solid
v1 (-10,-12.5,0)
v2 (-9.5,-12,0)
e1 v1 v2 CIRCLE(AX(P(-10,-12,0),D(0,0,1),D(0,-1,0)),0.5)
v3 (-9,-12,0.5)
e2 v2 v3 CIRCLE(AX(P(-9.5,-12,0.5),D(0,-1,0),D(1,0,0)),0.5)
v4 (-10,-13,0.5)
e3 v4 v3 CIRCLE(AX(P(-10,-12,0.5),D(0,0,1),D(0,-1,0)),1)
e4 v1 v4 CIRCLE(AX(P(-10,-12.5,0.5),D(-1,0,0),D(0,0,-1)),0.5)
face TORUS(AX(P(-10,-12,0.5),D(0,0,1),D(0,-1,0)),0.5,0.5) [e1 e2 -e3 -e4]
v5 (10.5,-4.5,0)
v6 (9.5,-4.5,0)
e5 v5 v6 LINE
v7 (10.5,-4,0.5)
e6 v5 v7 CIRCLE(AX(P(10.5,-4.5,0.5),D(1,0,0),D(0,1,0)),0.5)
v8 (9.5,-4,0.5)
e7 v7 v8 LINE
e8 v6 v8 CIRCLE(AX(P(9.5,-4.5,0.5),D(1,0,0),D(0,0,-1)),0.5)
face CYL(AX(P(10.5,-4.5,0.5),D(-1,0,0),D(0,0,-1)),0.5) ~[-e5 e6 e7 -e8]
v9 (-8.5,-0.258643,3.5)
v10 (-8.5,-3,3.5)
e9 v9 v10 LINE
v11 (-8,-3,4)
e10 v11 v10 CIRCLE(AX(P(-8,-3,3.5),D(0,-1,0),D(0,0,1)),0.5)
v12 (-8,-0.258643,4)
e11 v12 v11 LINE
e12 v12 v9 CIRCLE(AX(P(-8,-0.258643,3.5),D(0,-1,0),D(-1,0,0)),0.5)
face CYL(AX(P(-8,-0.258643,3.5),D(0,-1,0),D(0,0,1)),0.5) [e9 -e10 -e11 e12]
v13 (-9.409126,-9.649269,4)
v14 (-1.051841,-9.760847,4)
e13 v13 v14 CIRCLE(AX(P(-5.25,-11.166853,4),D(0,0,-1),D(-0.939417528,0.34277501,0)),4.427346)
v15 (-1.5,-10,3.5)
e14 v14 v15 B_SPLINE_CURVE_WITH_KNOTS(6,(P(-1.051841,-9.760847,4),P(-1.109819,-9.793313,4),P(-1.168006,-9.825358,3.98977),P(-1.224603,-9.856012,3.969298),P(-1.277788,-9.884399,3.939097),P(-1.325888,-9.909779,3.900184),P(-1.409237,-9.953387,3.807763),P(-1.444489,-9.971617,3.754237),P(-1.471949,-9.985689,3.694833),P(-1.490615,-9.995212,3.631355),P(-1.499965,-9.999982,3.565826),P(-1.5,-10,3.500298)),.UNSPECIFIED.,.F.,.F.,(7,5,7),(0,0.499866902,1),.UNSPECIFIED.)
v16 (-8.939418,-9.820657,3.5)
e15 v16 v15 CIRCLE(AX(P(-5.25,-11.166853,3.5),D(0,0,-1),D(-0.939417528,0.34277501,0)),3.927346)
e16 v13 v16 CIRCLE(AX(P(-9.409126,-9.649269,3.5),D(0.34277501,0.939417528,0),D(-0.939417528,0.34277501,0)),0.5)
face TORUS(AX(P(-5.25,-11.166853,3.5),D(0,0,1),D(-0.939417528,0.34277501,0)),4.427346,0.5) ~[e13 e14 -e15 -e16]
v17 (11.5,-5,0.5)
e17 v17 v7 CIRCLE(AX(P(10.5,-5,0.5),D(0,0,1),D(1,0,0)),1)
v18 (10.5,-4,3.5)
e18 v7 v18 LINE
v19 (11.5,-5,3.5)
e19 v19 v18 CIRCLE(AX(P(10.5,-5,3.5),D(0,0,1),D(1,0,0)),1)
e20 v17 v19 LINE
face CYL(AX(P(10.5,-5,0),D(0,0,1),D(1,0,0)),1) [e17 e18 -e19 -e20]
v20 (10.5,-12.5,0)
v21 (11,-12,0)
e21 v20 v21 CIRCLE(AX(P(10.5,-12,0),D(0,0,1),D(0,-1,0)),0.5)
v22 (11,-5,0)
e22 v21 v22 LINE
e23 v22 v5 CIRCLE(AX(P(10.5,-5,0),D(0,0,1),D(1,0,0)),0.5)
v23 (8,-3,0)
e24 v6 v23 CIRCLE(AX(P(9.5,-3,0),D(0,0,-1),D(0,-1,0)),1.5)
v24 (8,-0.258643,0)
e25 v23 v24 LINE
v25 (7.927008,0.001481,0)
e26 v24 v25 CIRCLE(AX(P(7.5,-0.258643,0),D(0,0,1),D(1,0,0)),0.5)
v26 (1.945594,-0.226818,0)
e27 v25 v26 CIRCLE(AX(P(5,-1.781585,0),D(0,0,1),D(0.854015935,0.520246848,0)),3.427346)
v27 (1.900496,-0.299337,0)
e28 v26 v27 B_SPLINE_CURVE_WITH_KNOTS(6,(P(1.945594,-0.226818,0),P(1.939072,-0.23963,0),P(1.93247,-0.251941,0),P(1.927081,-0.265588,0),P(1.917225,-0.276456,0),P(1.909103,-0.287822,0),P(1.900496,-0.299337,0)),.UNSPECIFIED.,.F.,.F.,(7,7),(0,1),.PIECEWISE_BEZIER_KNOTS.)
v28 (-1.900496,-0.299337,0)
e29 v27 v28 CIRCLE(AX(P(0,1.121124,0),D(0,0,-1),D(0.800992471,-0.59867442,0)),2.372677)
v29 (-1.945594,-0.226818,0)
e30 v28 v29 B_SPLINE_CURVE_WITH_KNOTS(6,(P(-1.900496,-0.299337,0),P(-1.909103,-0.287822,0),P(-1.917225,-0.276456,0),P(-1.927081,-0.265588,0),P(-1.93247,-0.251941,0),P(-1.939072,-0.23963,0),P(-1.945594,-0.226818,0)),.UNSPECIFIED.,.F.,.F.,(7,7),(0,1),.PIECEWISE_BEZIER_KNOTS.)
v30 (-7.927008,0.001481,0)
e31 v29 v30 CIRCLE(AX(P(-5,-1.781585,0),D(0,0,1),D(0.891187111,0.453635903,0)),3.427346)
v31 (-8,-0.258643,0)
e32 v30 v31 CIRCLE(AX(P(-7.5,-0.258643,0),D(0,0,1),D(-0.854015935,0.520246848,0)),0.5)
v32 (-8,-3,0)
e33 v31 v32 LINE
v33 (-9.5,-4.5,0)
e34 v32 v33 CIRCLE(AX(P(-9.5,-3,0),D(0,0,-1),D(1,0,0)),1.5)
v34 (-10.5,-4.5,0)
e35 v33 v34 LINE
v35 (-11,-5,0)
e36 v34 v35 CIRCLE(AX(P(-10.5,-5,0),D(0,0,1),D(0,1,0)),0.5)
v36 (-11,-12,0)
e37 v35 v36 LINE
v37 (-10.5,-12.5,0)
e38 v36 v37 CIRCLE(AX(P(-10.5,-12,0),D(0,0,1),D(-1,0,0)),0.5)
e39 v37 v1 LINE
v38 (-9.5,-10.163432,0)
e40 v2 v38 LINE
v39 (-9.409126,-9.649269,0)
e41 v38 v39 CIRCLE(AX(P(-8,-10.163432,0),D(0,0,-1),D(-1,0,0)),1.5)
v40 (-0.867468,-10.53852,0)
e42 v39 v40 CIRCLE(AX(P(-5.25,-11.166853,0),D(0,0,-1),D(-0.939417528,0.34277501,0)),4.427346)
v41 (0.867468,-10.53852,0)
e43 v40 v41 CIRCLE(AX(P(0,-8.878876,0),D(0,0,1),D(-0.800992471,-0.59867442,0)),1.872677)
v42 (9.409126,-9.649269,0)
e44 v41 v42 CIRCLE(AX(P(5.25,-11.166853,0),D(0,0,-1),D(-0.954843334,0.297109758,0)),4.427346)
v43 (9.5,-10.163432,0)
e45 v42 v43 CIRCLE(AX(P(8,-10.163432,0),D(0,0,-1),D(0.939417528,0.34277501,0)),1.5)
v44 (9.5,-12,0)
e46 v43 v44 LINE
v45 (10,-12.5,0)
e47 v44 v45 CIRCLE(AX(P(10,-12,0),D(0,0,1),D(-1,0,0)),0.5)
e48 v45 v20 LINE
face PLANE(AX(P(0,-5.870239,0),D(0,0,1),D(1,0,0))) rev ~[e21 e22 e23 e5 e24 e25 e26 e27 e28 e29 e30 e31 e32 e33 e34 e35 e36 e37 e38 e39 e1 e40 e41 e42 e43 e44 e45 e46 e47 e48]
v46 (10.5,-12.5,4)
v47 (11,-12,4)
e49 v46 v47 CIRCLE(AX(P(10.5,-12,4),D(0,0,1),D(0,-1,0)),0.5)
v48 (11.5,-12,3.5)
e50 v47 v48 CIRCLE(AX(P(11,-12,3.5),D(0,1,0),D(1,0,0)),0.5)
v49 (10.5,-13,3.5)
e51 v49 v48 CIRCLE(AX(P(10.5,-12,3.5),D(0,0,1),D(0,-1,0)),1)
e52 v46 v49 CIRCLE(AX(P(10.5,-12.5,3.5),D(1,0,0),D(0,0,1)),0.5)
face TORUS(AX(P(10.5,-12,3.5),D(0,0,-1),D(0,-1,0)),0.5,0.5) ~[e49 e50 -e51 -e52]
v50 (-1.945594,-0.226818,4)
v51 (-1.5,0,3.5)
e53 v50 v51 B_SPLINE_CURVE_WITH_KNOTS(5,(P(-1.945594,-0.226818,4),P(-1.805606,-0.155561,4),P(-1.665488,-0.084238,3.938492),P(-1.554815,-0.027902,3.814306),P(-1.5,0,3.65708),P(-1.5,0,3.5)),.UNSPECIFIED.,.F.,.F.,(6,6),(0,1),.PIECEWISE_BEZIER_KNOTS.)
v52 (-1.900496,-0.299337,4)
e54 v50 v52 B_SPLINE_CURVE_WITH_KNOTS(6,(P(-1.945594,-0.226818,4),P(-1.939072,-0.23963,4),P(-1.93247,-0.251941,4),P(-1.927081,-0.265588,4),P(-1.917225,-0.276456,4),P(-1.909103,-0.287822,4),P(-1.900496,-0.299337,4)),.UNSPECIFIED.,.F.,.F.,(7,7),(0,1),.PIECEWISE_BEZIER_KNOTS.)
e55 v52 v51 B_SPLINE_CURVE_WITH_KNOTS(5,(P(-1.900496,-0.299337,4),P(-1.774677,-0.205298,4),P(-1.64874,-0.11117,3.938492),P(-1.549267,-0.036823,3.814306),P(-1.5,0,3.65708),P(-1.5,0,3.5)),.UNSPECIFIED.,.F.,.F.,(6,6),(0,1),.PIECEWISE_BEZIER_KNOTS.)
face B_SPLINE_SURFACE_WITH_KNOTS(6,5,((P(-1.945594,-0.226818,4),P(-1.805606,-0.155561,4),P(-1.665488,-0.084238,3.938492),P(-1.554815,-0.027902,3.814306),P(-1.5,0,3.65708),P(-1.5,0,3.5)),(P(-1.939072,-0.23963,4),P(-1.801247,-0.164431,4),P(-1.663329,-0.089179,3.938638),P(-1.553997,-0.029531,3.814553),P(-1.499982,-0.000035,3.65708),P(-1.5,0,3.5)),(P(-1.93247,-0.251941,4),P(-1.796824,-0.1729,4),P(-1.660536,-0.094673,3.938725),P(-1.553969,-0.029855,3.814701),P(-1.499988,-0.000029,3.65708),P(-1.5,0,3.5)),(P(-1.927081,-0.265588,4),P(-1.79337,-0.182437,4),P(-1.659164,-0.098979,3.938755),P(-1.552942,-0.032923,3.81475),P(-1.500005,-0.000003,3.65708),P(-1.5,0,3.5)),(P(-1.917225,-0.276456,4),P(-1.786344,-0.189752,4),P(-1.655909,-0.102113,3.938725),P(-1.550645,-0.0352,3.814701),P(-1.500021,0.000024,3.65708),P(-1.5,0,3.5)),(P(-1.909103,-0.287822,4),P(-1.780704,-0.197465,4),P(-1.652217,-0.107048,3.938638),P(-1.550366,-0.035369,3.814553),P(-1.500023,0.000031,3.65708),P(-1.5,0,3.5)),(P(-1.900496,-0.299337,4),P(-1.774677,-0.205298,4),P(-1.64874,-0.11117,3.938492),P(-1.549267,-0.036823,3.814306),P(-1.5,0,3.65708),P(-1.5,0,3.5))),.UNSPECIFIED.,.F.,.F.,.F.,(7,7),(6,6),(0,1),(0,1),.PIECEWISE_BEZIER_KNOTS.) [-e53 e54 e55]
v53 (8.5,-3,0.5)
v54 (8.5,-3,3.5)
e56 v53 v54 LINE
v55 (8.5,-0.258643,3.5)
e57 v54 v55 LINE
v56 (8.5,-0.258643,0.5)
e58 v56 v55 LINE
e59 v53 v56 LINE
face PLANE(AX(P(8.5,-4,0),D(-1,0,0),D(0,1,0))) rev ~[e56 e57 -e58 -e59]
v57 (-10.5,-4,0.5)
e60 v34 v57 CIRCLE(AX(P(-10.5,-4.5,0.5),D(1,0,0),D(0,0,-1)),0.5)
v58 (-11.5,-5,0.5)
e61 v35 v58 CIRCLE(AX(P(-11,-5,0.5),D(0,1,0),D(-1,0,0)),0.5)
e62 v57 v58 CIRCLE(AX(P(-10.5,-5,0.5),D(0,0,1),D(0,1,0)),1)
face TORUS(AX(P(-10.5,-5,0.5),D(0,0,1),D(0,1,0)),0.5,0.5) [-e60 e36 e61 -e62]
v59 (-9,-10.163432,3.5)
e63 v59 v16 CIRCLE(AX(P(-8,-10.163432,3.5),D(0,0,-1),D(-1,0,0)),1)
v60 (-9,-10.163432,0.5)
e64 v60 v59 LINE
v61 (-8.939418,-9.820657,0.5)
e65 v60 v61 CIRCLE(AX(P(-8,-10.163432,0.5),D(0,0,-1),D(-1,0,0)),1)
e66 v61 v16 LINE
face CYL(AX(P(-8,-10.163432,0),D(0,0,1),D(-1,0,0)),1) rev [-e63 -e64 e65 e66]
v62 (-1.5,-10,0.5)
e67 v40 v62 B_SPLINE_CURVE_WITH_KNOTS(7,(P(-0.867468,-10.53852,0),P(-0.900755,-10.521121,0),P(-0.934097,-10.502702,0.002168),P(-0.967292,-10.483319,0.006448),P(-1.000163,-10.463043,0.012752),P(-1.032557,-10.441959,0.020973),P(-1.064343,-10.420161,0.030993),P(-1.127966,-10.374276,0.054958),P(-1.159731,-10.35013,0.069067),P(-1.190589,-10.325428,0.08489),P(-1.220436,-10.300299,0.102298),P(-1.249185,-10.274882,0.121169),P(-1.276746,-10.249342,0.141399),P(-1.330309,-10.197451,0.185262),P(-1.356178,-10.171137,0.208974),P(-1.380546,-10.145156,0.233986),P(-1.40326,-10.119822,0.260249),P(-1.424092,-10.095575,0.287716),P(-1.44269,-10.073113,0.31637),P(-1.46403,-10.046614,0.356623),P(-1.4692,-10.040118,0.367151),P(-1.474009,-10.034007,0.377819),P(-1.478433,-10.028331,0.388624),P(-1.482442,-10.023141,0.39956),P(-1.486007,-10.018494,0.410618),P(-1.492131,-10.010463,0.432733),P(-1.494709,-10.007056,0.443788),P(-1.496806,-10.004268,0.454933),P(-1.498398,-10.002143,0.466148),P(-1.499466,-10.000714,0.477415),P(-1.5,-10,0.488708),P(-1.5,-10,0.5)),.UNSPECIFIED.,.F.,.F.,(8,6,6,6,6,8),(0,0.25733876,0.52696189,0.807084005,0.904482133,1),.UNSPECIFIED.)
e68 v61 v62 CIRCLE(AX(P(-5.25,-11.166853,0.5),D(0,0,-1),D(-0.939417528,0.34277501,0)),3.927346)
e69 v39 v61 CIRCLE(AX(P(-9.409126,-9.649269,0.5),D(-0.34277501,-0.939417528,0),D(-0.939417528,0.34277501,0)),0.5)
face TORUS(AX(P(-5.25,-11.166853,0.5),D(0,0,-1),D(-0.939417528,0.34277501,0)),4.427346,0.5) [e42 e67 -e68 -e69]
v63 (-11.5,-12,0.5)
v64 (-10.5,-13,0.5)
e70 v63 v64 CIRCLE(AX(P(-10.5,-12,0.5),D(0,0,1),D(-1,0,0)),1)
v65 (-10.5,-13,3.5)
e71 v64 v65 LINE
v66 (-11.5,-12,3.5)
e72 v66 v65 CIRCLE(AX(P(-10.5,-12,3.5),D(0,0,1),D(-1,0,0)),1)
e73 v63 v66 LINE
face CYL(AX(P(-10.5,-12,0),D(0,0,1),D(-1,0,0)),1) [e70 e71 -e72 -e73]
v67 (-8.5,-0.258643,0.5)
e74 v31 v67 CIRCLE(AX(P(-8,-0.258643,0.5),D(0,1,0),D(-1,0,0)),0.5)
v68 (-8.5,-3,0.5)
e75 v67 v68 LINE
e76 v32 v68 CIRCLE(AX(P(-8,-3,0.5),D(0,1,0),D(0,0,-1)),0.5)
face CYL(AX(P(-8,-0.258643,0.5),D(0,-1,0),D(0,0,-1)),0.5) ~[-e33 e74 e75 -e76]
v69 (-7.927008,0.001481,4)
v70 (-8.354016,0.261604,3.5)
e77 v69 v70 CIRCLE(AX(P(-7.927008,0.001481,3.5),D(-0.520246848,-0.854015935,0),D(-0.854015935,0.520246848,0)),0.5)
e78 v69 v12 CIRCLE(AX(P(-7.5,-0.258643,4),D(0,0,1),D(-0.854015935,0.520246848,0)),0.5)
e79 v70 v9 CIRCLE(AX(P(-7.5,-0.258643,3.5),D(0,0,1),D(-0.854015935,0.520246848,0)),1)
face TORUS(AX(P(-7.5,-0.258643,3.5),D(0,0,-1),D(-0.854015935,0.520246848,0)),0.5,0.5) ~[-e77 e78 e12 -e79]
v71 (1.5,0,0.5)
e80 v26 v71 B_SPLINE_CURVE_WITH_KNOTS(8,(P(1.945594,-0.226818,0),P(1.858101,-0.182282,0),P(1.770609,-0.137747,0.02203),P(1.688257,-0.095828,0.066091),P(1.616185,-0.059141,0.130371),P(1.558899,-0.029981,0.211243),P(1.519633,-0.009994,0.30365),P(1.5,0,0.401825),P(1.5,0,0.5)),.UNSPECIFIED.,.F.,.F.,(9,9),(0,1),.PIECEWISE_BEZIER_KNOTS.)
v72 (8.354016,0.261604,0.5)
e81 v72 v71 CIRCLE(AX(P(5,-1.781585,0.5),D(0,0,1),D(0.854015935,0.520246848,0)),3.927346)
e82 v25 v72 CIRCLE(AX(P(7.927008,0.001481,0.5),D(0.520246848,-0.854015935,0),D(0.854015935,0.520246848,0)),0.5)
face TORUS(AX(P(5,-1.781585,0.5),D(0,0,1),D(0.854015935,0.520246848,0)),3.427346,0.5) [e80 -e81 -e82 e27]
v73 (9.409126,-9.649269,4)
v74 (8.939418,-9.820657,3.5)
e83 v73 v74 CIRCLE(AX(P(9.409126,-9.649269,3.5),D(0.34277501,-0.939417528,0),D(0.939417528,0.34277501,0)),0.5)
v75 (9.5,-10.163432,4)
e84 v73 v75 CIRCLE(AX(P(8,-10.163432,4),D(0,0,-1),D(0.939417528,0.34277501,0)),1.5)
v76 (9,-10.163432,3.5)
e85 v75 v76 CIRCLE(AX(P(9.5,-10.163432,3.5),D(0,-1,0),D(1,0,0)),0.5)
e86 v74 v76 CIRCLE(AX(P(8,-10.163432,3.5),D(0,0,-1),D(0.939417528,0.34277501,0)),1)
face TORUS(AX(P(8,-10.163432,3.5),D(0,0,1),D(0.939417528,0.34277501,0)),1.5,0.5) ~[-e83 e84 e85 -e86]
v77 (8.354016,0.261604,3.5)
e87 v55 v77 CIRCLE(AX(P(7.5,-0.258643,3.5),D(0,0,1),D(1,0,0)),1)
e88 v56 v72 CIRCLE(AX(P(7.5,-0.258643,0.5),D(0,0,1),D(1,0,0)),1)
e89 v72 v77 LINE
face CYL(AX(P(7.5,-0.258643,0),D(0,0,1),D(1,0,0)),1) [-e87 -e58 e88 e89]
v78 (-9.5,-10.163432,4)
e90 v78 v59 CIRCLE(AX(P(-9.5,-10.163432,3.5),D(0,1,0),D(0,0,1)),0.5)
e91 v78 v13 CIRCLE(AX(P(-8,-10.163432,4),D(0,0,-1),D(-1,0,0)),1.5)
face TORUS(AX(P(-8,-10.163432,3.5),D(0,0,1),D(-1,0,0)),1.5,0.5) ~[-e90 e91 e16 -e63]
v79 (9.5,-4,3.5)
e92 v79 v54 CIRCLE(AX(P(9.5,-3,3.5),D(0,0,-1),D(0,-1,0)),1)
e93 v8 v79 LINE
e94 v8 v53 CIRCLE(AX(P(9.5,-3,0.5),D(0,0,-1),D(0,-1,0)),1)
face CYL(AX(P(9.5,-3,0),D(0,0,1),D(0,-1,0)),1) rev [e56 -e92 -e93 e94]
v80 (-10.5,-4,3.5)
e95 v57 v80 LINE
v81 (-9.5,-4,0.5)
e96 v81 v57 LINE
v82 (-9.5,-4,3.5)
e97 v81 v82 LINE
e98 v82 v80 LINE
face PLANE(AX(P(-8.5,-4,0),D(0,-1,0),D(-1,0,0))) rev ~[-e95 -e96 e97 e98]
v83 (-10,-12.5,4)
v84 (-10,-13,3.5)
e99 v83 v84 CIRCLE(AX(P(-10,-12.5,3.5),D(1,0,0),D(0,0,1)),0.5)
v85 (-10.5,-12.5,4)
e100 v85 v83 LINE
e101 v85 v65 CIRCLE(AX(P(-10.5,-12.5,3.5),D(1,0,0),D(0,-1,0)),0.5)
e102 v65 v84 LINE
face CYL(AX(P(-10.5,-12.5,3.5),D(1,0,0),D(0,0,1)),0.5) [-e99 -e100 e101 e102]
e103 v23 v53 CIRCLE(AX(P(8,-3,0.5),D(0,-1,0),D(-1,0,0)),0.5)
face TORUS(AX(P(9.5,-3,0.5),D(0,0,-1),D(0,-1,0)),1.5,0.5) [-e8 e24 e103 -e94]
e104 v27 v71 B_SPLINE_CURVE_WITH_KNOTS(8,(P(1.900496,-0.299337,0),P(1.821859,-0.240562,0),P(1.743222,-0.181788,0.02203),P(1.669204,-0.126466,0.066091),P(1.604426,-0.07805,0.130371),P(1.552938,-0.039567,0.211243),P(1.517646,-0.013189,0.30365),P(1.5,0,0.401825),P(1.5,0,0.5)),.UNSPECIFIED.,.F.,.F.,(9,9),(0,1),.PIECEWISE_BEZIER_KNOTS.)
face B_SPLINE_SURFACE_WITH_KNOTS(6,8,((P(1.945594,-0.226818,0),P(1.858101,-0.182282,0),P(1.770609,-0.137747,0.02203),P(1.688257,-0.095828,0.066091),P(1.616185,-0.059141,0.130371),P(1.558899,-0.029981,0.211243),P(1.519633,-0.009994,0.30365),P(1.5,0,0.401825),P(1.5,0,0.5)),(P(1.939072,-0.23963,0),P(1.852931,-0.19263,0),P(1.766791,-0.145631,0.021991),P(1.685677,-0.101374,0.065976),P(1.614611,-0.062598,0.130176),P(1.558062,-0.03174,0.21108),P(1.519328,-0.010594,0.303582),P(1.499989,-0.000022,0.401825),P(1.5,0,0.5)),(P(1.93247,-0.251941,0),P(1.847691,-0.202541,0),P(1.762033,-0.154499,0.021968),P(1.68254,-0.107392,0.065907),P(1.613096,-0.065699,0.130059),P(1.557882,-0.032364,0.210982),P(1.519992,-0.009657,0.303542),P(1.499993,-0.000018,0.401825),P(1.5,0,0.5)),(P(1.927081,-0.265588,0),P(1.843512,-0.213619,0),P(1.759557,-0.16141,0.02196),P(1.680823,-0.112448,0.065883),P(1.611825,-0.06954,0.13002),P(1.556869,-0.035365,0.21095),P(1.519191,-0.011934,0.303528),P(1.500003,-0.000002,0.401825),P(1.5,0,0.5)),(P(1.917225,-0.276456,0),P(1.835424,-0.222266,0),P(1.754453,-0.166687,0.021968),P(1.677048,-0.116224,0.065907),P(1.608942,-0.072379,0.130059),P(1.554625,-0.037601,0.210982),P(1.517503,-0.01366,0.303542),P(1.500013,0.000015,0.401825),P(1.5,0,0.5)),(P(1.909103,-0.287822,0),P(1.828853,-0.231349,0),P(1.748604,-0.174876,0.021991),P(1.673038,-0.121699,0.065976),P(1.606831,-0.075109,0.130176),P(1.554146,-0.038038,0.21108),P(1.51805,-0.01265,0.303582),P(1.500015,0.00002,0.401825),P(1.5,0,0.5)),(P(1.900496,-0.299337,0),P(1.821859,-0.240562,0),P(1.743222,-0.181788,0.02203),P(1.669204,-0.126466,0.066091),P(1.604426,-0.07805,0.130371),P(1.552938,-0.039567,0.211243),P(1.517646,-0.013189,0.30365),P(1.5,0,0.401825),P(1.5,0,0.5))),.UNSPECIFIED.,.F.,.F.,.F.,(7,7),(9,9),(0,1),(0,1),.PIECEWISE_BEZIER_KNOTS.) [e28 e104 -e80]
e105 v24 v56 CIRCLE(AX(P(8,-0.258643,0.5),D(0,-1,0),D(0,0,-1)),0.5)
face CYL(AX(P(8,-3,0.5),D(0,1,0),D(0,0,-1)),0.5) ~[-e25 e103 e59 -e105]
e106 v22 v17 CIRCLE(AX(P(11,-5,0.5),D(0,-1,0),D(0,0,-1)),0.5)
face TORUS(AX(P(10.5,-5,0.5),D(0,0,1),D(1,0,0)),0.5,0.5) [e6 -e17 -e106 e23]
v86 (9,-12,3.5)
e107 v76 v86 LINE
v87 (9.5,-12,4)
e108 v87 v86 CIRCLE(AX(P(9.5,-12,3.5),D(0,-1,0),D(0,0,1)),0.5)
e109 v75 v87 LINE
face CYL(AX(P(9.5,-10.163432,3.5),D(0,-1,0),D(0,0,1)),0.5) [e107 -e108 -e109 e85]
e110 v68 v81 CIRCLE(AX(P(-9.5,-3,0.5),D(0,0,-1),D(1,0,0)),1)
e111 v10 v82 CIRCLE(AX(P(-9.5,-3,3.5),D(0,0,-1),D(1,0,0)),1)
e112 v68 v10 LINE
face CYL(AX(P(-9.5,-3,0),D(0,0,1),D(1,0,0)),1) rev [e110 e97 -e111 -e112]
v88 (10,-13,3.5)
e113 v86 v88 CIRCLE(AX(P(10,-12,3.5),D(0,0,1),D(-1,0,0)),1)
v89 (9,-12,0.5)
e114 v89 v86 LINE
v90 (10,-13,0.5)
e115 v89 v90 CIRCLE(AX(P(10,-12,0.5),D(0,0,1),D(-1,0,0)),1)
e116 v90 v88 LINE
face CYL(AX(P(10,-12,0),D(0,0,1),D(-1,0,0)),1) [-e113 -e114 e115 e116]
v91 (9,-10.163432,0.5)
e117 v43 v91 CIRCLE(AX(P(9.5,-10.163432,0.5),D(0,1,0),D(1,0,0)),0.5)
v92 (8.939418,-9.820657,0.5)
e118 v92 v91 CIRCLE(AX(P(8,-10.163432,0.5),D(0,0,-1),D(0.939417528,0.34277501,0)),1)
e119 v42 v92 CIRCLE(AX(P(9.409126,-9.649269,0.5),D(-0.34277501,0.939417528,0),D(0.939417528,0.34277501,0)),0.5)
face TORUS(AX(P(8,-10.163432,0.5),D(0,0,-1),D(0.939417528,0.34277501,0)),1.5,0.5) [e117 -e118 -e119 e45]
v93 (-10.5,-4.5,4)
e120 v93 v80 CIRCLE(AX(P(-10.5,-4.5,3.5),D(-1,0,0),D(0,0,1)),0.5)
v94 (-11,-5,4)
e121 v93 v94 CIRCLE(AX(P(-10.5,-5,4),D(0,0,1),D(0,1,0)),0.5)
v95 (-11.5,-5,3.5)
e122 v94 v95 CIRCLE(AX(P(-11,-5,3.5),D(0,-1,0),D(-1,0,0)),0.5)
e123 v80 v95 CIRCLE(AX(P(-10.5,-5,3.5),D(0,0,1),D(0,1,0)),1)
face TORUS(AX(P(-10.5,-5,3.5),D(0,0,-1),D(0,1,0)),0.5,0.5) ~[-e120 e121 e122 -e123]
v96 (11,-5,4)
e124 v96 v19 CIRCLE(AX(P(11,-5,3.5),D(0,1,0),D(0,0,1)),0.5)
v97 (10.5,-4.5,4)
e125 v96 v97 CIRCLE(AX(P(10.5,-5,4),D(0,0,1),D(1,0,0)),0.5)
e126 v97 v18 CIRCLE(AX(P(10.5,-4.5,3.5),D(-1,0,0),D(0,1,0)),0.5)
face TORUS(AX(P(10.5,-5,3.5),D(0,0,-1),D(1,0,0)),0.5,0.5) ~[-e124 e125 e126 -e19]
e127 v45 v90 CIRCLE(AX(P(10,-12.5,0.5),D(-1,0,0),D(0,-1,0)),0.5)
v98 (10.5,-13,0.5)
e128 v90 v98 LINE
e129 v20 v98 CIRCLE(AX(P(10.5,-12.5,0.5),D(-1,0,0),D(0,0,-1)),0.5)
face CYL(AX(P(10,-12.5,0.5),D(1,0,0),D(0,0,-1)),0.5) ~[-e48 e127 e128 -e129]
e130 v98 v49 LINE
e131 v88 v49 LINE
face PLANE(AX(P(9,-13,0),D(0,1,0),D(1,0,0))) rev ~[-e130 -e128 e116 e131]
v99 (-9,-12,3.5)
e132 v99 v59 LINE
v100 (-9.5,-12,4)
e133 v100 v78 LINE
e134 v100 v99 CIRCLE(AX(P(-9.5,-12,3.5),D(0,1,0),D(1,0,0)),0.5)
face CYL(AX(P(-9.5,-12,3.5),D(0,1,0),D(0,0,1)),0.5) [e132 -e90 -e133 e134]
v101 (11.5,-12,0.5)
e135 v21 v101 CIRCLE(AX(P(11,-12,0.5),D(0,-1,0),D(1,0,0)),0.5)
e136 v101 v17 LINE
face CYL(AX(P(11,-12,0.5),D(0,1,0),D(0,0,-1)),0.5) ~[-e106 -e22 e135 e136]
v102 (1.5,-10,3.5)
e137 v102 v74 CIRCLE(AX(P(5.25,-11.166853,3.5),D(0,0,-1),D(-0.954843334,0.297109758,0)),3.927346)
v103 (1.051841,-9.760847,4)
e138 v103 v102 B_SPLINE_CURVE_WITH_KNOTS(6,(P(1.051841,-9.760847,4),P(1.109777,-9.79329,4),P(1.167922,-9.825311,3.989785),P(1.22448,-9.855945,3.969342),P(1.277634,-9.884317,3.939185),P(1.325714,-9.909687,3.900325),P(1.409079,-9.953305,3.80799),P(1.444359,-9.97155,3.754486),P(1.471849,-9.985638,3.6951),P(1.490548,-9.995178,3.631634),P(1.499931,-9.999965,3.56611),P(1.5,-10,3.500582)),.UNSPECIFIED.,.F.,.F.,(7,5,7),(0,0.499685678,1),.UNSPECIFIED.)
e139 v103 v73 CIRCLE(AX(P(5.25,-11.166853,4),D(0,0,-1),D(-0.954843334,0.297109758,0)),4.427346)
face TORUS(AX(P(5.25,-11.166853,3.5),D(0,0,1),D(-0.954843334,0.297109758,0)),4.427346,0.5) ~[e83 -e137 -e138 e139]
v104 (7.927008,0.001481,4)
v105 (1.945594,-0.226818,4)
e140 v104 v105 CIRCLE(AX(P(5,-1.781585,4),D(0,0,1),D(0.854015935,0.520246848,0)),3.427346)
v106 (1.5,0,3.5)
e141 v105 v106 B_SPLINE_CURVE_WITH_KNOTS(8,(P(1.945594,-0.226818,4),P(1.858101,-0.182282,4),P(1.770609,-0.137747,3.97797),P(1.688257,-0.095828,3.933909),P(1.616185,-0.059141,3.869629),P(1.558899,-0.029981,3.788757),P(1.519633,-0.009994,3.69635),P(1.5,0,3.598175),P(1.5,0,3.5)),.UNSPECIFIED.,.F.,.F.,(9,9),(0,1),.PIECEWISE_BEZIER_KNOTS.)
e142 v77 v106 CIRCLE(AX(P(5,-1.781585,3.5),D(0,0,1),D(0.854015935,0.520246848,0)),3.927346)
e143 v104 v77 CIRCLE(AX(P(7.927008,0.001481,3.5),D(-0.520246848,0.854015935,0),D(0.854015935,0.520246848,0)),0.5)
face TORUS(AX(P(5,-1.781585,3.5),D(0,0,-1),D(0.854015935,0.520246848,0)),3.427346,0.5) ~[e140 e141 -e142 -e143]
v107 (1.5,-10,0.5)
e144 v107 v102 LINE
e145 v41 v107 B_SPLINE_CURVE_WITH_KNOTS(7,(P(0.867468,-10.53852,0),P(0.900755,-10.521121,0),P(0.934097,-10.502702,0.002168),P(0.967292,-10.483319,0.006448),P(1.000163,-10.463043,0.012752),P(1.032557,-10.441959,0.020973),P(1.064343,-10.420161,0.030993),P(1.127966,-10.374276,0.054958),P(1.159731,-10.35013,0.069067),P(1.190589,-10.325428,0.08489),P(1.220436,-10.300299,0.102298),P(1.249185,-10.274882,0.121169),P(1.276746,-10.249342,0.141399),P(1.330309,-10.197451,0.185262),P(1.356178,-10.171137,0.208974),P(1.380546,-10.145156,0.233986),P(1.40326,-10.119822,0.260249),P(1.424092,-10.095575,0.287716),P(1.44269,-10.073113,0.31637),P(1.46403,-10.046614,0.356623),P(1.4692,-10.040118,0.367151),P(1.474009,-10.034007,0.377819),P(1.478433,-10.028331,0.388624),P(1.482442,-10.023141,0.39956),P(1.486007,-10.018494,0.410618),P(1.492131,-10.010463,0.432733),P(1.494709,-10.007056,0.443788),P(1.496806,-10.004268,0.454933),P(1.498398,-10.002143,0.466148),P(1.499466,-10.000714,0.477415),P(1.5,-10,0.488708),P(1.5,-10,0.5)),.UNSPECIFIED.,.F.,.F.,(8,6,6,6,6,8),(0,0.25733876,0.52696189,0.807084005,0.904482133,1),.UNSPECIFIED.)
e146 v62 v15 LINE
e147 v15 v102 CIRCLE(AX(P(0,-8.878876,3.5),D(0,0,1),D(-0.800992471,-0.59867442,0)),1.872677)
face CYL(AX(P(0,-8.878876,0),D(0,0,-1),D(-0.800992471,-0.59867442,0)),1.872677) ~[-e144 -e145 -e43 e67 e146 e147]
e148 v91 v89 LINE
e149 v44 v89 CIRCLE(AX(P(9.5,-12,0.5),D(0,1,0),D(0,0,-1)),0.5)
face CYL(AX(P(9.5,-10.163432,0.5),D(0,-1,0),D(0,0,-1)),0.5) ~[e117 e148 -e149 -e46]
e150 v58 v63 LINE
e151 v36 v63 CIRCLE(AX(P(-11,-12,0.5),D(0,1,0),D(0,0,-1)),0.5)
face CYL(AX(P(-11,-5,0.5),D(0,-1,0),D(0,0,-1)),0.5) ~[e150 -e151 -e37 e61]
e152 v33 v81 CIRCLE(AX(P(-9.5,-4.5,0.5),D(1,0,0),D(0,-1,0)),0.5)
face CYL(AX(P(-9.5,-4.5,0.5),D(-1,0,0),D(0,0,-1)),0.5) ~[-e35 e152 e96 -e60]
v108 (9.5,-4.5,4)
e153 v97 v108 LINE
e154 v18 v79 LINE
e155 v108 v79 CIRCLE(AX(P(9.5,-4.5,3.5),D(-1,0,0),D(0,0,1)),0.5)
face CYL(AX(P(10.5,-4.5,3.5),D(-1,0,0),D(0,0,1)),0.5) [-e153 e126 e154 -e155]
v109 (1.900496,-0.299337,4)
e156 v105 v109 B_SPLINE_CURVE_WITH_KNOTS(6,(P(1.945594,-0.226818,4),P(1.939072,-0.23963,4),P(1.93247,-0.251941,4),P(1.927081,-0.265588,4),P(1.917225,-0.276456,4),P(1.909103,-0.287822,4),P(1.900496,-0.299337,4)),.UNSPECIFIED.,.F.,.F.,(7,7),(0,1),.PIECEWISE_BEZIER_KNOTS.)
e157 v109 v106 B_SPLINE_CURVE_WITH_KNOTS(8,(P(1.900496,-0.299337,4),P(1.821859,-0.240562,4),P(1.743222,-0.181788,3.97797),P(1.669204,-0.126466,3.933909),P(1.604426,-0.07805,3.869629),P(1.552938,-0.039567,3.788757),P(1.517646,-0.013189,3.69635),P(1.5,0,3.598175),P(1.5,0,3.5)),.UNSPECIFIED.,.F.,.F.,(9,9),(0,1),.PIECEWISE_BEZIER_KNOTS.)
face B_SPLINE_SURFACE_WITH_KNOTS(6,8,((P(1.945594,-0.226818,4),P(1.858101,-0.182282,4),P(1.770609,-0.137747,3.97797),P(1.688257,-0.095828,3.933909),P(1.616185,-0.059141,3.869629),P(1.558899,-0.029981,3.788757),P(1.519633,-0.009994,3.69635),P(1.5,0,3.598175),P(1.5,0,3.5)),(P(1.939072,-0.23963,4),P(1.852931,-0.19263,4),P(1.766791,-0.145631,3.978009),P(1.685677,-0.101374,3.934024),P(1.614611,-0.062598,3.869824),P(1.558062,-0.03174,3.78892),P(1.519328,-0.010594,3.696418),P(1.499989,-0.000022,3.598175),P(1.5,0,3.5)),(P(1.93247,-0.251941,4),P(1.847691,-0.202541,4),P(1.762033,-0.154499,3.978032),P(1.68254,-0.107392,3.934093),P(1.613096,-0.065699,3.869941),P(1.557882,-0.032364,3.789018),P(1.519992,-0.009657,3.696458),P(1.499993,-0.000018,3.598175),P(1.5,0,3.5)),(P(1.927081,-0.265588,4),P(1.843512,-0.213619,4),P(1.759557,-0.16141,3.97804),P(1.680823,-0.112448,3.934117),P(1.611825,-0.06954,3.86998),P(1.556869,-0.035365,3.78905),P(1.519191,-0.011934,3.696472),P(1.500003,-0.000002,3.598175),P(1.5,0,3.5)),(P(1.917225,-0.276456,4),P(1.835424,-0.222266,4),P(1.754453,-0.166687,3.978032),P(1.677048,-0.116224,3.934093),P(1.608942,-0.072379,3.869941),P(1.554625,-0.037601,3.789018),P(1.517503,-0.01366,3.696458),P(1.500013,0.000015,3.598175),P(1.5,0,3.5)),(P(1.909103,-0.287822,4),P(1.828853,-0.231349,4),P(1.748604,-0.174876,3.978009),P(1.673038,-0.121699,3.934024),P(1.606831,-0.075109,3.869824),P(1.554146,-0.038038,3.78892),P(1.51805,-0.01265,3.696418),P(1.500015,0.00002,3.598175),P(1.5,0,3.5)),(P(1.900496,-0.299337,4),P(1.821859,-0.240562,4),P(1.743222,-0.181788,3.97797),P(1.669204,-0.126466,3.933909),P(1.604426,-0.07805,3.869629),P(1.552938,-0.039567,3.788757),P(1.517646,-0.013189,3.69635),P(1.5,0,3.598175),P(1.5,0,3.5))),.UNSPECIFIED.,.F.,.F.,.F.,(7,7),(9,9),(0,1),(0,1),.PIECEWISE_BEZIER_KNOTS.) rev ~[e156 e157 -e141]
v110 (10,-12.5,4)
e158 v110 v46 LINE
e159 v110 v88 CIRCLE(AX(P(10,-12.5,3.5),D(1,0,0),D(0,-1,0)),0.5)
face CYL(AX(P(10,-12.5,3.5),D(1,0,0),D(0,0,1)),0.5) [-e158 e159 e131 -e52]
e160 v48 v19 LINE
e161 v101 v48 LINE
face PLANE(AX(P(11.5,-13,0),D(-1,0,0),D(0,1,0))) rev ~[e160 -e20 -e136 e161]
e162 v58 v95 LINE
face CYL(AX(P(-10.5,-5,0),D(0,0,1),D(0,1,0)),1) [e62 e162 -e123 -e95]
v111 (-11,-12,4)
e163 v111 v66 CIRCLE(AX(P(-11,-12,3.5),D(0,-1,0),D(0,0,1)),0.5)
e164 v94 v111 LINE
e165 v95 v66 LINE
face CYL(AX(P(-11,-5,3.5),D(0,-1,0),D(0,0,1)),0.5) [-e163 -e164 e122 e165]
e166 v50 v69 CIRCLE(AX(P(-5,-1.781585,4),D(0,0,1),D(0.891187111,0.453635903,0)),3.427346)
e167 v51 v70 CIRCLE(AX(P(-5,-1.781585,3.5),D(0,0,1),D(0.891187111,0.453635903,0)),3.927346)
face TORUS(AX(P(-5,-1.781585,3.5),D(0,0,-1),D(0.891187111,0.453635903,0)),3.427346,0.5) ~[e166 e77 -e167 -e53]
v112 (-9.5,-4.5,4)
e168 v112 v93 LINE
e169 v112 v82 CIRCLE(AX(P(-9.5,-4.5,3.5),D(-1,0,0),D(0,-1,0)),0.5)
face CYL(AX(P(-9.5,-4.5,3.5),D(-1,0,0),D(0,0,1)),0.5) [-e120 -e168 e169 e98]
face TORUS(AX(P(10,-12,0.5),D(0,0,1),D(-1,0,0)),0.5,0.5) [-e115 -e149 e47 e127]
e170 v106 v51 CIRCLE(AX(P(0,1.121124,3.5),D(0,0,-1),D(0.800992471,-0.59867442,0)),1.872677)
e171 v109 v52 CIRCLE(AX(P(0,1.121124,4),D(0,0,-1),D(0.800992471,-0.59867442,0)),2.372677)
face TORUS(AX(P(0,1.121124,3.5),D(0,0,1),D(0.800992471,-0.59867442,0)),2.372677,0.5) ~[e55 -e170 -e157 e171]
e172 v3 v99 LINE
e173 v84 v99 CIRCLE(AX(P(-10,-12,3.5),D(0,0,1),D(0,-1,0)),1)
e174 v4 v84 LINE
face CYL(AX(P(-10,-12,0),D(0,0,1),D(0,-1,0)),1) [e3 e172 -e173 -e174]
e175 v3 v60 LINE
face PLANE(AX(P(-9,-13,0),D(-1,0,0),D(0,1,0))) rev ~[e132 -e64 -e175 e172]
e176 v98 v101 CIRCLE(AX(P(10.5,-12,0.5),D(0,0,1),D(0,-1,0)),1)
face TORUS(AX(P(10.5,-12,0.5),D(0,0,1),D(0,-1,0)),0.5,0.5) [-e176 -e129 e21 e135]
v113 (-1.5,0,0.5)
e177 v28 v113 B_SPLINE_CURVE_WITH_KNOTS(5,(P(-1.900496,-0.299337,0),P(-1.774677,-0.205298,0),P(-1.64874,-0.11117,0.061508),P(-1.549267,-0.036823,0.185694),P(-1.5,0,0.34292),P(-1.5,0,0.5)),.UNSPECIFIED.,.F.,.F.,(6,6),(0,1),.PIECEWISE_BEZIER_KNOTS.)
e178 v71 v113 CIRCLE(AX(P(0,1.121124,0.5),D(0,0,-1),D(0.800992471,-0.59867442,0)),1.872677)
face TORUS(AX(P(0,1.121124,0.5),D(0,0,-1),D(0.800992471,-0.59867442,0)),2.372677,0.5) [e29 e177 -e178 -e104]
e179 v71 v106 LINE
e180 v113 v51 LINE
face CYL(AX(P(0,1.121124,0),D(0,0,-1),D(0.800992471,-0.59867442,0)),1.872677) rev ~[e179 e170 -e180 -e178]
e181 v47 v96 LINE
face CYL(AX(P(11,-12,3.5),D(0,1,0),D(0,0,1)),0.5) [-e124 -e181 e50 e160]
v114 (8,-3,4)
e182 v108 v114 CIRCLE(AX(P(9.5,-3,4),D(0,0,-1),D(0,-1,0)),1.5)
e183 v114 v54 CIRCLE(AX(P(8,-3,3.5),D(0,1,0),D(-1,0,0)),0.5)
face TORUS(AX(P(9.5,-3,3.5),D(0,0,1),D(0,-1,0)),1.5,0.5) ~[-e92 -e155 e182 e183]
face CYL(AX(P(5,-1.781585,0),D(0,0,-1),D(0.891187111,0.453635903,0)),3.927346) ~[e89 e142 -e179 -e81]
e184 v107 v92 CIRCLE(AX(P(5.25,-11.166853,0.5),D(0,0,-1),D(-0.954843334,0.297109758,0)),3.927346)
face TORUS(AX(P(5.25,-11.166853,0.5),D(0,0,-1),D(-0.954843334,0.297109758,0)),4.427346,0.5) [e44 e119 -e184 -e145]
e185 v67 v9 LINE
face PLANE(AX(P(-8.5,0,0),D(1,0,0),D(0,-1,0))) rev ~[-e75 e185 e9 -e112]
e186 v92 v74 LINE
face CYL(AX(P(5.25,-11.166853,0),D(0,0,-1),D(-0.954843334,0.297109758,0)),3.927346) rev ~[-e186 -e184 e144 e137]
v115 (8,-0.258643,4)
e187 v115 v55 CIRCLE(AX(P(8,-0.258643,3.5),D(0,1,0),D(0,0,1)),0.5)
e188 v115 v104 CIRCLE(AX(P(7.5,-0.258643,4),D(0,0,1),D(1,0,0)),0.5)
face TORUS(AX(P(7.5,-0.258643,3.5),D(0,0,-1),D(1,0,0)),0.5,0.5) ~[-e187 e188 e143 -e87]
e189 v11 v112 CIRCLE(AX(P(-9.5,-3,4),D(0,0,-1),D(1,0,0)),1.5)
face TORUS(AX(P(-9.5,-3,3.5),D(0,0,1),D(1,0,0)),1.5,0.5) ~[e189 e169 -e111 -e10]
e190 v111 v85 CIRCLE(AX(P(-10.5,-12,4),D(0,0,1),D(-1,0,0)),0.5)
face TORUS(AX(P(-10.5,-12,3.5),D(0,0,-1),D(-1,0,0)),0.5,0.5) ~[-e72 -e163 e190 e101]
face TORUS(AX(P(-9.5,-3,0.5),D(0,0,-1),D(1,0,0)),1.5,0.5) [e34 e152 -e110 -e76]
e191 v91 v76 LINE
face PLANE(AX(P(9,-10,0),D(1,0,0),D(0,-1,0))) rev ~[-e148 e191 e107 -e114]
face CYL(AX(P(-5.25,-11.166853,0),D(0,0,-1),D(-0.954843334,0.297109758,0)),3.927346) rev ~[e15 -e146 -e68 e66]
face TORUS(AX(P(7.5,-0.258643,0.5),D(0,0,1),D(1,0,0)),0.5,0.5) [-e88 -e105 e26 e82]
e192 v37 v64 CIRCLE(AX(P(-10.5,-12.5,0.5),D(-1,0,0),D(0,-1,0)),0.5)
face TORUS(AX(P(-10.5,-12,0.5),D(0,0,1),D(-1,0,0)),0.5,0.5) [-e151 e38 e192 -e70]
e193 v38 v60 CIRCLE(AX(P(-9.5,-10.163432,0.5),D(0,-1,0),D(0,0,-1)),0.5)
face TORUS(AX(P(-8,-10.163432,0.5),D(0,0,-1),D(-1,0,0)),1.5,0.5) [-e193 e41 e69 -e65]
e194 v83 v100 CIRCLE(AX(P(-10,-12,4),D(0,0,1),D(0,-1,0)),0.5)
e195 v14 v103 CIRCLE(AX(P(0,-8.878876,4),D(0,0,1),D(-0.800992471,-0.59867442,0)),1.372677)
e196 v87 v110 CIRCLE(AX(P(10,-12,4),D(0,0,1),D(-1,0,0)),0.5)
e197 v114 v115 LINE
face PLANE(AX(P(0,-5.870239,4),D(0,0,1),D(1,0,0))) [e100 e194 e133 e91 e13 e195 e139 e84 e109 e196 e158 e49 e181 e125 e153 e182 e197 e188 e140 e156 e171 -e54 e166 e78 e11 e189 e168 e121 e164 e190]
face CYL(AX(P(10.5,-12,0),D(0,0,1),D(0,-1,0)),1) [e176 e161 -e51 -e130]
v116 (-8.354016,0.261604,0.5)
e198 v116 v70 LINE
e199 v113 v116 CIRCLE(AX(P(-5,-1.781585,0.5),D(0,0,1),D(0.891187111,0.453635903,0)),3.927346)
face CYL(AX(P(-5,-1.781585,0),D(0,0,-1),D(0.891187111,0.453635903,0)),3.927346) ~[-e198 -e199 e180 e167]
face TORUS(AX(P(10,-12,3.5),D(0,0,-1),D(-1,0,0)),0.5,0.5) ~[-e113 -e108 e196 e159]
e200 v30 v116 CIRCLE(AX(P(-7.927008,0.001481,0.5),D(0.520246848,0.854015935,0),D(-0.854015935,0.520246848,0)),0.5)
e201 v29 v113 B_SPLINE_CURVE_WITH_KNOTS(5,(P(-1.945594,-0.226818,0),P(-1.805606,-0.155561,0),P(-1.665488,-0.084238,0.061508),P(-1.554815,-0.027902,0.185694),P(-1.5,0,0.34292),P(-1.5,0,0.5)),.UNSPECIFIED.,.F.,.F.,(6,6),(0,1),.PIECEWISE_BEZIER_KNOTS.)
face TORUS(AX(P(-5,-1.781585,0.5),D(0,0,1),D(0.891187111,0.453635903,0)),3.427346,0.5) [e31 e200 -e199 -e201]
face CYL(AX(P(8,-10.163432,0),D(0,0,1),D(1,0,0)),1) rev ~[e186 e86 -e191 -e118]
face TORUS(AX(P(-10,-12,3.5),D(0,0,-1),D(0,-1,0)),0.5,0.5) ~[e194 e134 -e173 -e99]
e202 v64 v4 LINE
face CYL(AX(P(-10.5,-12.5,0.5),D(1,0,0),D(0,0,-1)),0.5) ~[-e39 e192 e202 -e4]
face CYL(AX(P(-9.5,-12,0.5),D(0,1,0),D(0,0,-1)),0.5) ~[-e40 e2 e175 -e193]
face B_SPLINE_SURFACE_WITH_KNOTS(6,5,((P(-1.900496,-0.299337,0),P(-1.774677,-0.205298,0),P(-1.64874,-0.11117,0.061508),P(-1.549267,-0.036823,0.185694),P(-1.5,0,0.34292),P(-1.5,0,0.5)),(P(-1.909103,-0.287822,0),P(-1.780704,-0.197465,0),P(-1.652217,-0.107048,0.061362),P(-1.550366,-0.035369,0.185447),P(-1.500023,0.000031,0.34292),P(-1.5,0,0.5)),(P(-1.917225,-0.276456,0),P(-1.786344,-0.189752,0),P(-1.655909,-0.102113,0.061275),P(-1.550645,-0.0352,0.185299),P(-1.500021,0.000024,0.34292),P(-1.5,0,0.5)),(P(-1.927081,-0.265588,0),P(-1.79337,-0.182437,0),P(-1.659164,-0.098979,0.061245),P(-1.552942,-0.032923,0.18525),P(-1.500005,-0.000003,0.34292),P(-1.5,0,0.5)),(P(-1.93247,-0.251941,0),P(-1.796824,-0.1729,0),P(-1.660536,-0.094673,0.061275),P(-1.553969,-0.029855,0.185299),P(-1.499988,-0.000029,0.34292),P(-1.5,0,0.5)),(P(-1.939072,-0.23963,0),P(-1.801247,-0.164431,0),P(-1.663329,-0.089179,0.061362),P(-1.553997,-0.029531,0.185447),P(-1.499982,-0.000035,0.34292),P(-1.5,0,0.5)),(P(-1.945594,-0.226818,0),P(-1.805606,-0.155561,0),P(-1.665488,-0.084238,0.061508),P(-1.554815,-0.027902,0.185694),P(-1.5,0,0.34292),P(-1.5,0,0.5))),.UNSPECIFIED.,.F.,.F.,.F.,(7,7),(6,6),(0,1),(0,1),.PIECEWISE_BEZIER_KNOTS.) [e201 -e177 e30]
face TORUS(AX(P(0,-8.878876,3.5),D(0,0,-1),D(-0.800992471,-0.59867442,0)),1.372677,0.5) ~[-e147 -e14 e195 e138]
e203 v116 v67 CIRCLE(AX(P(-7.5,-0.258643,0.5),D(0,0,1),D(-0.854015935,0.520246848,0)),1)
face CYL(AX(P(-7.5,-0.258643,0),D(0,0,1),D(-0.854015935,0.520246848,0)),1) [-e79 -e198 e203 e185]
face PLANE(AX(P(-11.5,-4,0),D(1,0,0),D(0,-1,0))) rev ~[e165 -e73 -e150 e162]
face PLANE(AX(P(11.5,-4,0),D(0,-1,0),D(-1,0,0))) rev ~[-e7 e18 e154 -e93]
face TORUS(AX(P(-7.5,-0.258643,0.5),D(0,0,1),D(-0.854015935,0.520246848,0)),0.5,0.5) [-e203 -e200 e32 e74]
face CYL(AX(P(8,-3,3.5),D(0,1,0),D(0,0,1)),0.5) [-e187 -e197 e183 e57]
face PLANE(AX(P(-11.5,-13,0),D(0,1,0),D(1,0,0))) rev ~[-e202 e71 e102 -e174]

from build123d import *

# Parameters (mm, degrees)
F1_DEPTH = 4
F2_R     = 1
F3_R     = 0.5


# Not quite as in the source:
# - a feature names something its author has since deleted; it is built from what else it names


with BuildPart() as f1:
    # F0 (on Top) → F1 (new body)
    with BuildSketch(Plane.XY):
        with BuildLine():
            Line((9, -10), (9, -13))
            Line((9, -13), (11.5, -13))
            Line((11.5, -13), (11.5, -4))
            Line((11.5, -4), (8.5, -4))
            Line((8.5, -4), (8.5, 0))
            ThreePointArc((8.5, 0), (5, 2.1457607663), (1.5, 0))
            ThreePointArc((1.5, 0), (0, -0.7515530935), (-1.5, 0))
            ThreePointArc((-1.5, 0), (-5, 2.1457607663), (-8.5, 0))
            Line((-8.5, 0), (-8.5, -4))
            Line((-8.5, -4), (-11.5, -4))
            Line((-11.5, -4), (-11.5, -13))
            Line((-11.5, -13), (-9, -13))
            Line((-9, -13), (-9, -10))
            ThreePointArc((-9, -10), (-5.25, -7.2395069282), (-1.5, -10))
            ThreePointArc((-1.5, -10), (0, -10.7515530935), (1.5, -10))
            ThreePointArc((1.5, -10), (5.25, -7.2395069282), (9, -10))
        make_face()
    extrude(amount=F1_DEPTH)

    # F2
    f2_edges = [f1.edges().sort_by_distance(p)[0] for p in [
        (-9, -13, 2),
        (9, -13, 2),
        (-11.5, -4, 2),
        (-8.5, -4, 2),
        (8.5, -4, 2),
        (11.5, -4, 2),
        (9, -10, 2),
        (11.5, -13, 2),
        (8.5, 0, 2),
        (-8.5, 0, 2),
        (-11.5, -13, 2),
        (-9, -10, 2),
    ]]
    fillet(f2_edges, radius=F2_R)

    # F3 (call 1 of 2: OpenCascade refuses the feature's edges together)
    f3_edges = [f1.edges().sort_by_distance(p)[0] for p in [
        (-4.85021, 2.142903, 4),
        (-8.462813, 0.011528, 4),
        (-8.5, -1.629321, 4),
        (-8.792893, -3.707107, 4),
        (-10, -4, 4),
        (-11.207107, -4.292893, 4),
        (-11.5, -8.5, 4),
        (-11.207107, -12.707107, 4),
        (-10.25, -13, 4),
        (-9.292893, -12.707107, 4),
        (-9, -11.081716, 4),
        (-5.15535, -7.240648, 4),
        (-8.984738, -9.989388, 4),
        (0, -10.751553, 4),
        (5.15535, -7.240648, 4),
        (8.984738, -9.989388, 4),
        (9, -11.081716, 4),
        (9.292893, -12.707107, 4),
        (10.25, -13, 4),
        (11.207107, -12.707107, 4),
        (11.5, -8.5, 4),
        (10, -4, 4),
        (8.792893, -3.707107, 4),
        (11.207107, -4.292893, 4),
        (8.5, -1.629321, 4),
        (8.462813, 0.011528, 4),
        (4.85021, 2.142903, 4),
        (0, -0.751553, 4),
    ]]
    fillet(f3_edges, radius=F3_R)

    # F3#2 (call 2 of 2)
    f3_2_edges = [f1.edges().sort_by_distance(p)[0] for p in [
        (4.85021, 2.142903, 0),
        (0, -0.751553, 0),
        (-4.85021, 2.142903, 0),
        (-8.462813, 0.011528, 0),
        (-8.5, -1.629321, 0),
        (-8.792893, -3.707107, 0),
        (-10, -4, 0),
        (5.15535, -7.240648, 0),
        (8.984738, -9.989388, 0),
        (9, -11.081716, 0),
        (-5.15535, -7.240648, 0),
        (9.292893, -12.707107, 0),
        (-8.984738, -9.989388, 0),
        (10.25, -13, 0),
        (-9, -11.081716, 0),
        (11.207107, -12.707107, 0),
        (-9.292893, -12.707107, 0),
        (11.5, -8.5, 0),
        (-10.25, -13, 0),
        (11.207107, -4.292893, 0),
        (-11.207107, -12.707107, 0),
        (10, -4, 0),
        (-11.5, -8.5, 0),
        (8.792893, -3.707107, 0),
        (-11.207107, -4.292893, 0),
        (8.5, -1.629321, 0),
        (8.462813, 0.011528, 0),
    ]]
    fillet(f3_2_edges, radius=F3_R)


solid = f1.part
